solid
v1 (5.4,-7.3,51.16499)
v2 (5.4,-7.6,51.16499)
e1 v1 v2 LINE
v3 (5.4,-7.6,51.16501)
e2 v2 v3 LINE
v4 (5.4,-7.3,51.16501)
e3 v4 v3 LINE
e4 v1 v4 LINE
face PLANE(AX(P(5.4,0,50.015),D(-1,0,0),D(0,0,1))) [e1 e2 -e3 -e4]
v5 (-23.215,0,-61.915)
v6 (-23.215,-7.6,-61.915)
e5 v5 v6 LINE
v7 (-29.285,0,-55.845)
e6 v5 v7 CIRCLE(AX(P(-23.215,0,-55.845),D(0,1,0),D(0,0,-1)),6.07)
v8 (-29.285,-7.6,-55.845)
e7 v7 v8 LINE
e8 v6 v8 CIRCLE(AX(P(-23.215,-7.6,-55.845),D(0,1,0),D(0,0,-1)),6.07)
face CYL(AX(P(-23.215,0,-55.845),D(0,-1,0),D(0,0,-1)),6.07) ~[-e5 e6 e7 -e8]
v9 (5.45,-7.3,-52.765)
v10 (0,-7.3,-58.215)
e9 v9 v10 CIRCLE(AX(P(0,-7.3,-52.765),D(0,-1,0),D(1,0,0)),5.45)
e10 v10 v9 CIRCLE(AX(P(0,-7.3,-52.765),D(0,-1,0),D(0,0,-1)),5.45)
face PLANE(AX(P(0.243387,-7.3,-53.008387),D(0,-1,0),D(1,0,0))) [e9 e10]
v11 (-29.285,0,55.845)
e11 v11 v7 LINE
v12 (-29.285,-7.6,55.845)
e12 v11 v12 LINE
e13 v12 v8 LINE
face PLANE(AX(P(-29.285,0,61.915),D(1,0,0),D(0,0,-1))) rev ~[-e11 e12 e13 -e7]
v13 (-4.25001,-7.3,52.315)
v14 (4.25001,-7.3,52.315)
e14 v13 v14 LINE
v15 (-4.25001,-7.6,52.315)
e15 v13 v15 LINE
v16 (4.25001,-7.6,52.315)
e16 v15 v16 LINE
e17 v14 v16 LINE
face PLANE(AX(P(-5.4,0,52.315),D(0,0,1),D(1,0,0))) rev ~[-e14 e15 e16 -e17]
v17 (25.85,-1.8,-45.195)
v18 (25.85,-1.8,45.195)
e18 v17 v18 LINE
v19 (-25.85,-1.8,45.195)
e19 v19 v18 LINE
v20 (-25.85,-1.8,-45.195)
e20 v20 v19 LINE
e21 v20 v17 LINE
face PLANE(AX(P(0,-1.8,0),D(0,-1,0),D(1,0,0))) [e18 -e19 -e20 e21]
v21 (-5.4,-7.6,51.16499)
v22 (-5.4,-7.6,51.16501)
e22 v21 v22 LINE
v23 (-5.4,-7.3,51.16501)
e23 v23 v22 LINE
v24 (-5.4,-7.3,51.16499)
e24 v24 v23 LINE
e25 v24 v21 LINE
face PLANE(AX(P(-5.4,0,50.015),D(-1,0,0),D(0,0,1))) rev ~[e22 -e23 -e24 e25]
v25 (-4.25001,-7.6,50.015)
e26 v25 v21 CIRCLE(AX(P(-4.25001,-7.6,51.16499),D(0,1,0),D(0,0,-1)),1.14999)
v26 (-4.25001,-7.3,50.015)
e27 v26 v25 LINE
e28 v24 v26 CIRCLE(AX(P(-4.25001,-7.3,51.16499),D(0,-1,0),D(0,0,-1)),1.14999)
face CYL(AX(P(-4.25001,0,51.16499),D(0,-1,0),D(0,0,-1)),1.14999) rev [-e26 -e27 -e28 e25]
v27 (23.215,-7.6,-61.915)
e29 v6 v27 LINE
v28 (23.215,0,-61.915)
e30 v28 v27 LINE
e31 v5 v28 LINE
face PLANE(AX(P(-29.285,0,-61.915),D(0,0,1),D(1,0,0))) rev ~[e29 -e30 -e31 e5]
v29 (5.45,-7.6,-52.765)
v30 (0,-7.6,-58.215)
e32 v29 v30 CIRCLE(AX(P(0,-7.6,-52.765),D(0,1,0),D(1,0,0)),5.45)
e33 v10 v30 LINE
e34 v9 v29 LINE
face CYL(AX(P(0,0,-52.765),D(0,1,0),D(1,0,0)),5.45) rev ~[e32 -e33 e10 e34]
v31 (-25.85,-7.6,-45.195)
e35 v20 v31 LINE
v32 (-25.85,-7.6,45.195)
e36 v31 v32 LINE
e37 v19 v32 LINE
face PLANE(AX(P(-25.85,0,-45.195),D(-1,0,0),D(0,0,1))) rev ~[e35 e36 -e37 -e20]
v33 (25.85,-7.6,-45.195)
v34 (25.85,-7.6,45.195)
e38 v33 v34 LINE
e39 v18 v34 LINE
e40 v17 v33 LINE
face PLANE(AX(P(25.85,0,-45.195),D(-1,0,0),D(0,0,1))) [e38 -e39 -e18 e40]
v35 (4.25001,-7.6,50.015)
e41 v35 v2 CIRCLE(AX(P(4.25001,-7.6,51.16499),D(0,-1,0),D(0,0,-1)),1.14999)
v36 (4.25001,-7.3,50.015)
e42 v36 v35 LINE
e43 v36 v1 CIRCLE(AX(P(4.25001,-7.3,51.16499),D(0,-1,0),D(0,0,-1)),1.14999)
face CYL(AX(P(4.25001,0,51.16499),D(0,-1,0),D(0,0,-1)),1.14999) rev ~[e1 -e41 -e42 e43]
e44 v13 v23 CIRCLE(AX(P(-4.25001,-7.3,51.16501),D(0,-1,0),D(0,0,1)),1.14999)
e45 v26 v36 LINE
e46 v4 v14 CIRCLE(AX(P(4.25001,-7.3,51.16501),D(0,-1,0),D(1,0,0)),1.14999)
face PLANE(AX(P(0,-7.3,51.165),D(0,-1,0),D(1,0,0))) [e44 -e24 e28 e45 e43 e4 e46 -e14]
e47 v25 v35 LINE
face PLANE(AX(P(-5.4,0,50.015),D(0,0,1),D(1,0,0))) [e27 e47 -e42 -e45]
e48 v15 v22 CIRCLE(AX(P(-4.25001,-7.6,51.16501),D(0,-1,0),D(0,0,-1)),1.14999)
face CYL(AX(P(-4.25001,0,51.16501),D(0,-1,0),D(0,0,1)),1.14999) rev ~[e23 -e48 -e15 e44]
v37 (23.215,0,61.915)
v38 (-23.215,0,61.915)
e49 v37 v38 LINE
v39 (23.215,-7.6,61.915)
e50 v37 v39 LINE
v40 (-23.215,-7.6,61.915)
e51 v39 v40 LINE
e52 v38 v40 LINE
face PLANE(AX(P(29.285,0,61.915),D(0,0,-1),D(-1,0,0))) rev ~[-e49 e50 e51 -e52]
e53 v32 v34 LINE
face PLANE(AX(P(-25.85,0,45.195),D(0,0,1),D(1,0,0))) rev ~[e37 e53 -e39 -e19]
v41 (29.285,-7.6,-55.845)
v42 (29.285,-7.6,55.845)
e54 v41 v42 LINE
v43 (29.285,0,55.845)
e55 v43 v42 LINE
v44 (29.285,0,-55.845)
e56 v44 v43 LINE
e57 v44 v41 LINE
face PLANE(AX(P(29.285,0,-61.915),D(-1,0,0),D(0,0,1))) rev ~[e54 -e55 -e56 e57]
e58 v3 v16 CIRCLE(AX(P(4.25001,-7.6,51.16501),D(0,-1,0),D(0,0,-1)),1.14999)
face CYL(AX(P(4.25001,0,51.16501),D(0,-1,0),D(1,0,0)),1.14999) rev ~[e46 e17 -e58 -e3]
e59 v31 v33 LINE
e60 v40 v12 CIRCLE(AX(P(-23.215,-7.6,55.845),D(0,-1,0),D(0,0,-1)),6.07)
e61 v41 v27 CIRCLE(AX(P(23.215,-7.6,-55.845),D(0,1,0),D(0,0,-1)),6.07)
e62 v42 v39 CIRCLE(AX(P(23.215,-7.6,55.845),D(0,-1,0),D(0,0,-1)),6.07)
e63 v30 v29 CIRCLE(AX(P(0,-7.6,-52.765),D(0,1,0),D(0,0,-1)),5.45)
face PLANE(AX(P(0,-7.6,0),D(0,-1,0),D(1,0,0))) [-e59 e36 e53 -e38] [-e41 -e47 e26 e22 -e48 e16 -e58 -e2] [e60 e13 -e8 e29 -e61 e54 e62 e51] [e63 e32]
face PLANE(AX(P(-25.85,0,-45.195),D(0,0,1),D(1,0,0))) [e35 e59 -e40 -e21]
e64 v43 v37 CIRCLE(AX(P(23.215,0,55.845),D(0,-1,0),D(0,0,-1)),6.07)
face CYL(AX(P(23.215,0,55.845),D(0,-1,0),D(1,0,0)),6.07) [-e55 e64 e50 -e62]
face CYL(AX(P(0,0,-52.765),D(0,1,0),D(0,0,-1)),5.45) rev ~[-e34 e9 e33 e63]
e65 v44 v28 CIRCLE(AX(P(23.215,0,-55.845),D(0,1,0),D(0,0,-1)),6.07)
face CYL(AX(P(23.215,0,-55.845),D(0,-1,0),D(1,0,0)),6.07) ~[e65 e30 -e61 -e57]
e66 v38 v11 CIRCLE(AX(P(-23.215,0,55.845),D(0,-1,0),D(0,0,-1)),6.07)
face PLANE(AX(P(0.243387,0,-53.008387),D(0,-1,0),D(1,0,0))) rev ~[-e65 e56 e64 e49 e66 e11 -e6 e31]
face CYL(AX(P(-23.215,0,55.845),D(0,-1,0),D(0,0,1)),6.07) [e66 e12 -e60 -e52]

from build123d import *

# Parameters (mm, degrees)
F0_W     = 51.7
F0_H     = 90.39
F0_W_2   = 10.8
F0_H_2   = 2.3
F1_DEPTH = 7.6
F2_R     = 6.07
F3_DEPTH = 1.8
F4_R     = 1.14999
F5_DEPTH = 7.3
F6_DEPTH = 7.3


# Not quite as in the source:
# - a fillet or chamfer is up to 0.001 mm smaller than in the source, because OpenCascade refuses the exact size


with BuildPart() as f1:
    # F0 (on Front) → F1 (new body)
    with BuildSketch(Plane.XZ):
        Polygon((0, -61.915), (29.285, -61.915), (29.285, 61.915), (-29.285, 61.915), (-29.285, -61.915), align=None)
        with BuildLine():
            ThreePointArc((5.45, -52.765), (3.8537319575, -56.6187319575), (0, -58.215))
            ThreePointArc((0, -58.215), (-3.8537319575, -48.9112680425), (5.45, -52.765))
        make_face(mode=Mode.SUBTRACT)
        Rectangle(F0_W, F0_H, mode=Mode.SUBTRACT)
        with Locations((0, 51.165)):
            Rectangle(F0_W_2, F0_H_2, mode=Mode.SUBTRACT)
    extrude(amount=F1_DEPTH)

    # F2
    f2_edges = [f1.edges().sort_by_distance(p)[0] for p in [
        (-29.285, -3.8, 61.915),
        (29.285, -3.8, 61.915),
        (-29.285, -3.8, -61.915),
        (29.285, -3.8, -61.915),
    ]]
    fillet(f2_edges, radius=F2_R)

    # F0 (on Front) → F3 (join)
    with BuildSketch(Plane.XZ):
        Rectangle(F0_W, F0_H)
    extrude(amount=F3_DEPTH)

    # F4 (radius 1.15 in the source; OpenCascade refuses exactly that, so slightly less here)
    f4_edges = [f1.edges().sort_by_distance(p)[0] for p in [
        (-5.4, -3.8, 52.315),
        (5.4, -3.8, 52.315),
        (5.4, -3.8, 50.015),
        (-5.4, -3.8, 50.015),
    ]]
    fillet(f4_edges, radius=F4_R)

    # F0 (on Front) → F5 (join)
    with BuildSketch(Plane.XZ):
        with Locations((0, 51.165)):
            Rectangle(F0_W_2, F0_H_2)
    extrude(amount=F5_DEPTH)

    # F0 (on Front) → F6 (join)
    with BuildSketch(Plane.XZ):
        with BuildLine():
            ThreePointArc((5.45, -52.765), (-3.8537319575, -48.9112680425), (0, -58.215))
            ThreePointArc((0, -58.215), (3.8537319575, -56.6187319575), (5.45, -52.765))
        make_face()
    extrude(amount=F6_DEPTH)


solid = f1.part
